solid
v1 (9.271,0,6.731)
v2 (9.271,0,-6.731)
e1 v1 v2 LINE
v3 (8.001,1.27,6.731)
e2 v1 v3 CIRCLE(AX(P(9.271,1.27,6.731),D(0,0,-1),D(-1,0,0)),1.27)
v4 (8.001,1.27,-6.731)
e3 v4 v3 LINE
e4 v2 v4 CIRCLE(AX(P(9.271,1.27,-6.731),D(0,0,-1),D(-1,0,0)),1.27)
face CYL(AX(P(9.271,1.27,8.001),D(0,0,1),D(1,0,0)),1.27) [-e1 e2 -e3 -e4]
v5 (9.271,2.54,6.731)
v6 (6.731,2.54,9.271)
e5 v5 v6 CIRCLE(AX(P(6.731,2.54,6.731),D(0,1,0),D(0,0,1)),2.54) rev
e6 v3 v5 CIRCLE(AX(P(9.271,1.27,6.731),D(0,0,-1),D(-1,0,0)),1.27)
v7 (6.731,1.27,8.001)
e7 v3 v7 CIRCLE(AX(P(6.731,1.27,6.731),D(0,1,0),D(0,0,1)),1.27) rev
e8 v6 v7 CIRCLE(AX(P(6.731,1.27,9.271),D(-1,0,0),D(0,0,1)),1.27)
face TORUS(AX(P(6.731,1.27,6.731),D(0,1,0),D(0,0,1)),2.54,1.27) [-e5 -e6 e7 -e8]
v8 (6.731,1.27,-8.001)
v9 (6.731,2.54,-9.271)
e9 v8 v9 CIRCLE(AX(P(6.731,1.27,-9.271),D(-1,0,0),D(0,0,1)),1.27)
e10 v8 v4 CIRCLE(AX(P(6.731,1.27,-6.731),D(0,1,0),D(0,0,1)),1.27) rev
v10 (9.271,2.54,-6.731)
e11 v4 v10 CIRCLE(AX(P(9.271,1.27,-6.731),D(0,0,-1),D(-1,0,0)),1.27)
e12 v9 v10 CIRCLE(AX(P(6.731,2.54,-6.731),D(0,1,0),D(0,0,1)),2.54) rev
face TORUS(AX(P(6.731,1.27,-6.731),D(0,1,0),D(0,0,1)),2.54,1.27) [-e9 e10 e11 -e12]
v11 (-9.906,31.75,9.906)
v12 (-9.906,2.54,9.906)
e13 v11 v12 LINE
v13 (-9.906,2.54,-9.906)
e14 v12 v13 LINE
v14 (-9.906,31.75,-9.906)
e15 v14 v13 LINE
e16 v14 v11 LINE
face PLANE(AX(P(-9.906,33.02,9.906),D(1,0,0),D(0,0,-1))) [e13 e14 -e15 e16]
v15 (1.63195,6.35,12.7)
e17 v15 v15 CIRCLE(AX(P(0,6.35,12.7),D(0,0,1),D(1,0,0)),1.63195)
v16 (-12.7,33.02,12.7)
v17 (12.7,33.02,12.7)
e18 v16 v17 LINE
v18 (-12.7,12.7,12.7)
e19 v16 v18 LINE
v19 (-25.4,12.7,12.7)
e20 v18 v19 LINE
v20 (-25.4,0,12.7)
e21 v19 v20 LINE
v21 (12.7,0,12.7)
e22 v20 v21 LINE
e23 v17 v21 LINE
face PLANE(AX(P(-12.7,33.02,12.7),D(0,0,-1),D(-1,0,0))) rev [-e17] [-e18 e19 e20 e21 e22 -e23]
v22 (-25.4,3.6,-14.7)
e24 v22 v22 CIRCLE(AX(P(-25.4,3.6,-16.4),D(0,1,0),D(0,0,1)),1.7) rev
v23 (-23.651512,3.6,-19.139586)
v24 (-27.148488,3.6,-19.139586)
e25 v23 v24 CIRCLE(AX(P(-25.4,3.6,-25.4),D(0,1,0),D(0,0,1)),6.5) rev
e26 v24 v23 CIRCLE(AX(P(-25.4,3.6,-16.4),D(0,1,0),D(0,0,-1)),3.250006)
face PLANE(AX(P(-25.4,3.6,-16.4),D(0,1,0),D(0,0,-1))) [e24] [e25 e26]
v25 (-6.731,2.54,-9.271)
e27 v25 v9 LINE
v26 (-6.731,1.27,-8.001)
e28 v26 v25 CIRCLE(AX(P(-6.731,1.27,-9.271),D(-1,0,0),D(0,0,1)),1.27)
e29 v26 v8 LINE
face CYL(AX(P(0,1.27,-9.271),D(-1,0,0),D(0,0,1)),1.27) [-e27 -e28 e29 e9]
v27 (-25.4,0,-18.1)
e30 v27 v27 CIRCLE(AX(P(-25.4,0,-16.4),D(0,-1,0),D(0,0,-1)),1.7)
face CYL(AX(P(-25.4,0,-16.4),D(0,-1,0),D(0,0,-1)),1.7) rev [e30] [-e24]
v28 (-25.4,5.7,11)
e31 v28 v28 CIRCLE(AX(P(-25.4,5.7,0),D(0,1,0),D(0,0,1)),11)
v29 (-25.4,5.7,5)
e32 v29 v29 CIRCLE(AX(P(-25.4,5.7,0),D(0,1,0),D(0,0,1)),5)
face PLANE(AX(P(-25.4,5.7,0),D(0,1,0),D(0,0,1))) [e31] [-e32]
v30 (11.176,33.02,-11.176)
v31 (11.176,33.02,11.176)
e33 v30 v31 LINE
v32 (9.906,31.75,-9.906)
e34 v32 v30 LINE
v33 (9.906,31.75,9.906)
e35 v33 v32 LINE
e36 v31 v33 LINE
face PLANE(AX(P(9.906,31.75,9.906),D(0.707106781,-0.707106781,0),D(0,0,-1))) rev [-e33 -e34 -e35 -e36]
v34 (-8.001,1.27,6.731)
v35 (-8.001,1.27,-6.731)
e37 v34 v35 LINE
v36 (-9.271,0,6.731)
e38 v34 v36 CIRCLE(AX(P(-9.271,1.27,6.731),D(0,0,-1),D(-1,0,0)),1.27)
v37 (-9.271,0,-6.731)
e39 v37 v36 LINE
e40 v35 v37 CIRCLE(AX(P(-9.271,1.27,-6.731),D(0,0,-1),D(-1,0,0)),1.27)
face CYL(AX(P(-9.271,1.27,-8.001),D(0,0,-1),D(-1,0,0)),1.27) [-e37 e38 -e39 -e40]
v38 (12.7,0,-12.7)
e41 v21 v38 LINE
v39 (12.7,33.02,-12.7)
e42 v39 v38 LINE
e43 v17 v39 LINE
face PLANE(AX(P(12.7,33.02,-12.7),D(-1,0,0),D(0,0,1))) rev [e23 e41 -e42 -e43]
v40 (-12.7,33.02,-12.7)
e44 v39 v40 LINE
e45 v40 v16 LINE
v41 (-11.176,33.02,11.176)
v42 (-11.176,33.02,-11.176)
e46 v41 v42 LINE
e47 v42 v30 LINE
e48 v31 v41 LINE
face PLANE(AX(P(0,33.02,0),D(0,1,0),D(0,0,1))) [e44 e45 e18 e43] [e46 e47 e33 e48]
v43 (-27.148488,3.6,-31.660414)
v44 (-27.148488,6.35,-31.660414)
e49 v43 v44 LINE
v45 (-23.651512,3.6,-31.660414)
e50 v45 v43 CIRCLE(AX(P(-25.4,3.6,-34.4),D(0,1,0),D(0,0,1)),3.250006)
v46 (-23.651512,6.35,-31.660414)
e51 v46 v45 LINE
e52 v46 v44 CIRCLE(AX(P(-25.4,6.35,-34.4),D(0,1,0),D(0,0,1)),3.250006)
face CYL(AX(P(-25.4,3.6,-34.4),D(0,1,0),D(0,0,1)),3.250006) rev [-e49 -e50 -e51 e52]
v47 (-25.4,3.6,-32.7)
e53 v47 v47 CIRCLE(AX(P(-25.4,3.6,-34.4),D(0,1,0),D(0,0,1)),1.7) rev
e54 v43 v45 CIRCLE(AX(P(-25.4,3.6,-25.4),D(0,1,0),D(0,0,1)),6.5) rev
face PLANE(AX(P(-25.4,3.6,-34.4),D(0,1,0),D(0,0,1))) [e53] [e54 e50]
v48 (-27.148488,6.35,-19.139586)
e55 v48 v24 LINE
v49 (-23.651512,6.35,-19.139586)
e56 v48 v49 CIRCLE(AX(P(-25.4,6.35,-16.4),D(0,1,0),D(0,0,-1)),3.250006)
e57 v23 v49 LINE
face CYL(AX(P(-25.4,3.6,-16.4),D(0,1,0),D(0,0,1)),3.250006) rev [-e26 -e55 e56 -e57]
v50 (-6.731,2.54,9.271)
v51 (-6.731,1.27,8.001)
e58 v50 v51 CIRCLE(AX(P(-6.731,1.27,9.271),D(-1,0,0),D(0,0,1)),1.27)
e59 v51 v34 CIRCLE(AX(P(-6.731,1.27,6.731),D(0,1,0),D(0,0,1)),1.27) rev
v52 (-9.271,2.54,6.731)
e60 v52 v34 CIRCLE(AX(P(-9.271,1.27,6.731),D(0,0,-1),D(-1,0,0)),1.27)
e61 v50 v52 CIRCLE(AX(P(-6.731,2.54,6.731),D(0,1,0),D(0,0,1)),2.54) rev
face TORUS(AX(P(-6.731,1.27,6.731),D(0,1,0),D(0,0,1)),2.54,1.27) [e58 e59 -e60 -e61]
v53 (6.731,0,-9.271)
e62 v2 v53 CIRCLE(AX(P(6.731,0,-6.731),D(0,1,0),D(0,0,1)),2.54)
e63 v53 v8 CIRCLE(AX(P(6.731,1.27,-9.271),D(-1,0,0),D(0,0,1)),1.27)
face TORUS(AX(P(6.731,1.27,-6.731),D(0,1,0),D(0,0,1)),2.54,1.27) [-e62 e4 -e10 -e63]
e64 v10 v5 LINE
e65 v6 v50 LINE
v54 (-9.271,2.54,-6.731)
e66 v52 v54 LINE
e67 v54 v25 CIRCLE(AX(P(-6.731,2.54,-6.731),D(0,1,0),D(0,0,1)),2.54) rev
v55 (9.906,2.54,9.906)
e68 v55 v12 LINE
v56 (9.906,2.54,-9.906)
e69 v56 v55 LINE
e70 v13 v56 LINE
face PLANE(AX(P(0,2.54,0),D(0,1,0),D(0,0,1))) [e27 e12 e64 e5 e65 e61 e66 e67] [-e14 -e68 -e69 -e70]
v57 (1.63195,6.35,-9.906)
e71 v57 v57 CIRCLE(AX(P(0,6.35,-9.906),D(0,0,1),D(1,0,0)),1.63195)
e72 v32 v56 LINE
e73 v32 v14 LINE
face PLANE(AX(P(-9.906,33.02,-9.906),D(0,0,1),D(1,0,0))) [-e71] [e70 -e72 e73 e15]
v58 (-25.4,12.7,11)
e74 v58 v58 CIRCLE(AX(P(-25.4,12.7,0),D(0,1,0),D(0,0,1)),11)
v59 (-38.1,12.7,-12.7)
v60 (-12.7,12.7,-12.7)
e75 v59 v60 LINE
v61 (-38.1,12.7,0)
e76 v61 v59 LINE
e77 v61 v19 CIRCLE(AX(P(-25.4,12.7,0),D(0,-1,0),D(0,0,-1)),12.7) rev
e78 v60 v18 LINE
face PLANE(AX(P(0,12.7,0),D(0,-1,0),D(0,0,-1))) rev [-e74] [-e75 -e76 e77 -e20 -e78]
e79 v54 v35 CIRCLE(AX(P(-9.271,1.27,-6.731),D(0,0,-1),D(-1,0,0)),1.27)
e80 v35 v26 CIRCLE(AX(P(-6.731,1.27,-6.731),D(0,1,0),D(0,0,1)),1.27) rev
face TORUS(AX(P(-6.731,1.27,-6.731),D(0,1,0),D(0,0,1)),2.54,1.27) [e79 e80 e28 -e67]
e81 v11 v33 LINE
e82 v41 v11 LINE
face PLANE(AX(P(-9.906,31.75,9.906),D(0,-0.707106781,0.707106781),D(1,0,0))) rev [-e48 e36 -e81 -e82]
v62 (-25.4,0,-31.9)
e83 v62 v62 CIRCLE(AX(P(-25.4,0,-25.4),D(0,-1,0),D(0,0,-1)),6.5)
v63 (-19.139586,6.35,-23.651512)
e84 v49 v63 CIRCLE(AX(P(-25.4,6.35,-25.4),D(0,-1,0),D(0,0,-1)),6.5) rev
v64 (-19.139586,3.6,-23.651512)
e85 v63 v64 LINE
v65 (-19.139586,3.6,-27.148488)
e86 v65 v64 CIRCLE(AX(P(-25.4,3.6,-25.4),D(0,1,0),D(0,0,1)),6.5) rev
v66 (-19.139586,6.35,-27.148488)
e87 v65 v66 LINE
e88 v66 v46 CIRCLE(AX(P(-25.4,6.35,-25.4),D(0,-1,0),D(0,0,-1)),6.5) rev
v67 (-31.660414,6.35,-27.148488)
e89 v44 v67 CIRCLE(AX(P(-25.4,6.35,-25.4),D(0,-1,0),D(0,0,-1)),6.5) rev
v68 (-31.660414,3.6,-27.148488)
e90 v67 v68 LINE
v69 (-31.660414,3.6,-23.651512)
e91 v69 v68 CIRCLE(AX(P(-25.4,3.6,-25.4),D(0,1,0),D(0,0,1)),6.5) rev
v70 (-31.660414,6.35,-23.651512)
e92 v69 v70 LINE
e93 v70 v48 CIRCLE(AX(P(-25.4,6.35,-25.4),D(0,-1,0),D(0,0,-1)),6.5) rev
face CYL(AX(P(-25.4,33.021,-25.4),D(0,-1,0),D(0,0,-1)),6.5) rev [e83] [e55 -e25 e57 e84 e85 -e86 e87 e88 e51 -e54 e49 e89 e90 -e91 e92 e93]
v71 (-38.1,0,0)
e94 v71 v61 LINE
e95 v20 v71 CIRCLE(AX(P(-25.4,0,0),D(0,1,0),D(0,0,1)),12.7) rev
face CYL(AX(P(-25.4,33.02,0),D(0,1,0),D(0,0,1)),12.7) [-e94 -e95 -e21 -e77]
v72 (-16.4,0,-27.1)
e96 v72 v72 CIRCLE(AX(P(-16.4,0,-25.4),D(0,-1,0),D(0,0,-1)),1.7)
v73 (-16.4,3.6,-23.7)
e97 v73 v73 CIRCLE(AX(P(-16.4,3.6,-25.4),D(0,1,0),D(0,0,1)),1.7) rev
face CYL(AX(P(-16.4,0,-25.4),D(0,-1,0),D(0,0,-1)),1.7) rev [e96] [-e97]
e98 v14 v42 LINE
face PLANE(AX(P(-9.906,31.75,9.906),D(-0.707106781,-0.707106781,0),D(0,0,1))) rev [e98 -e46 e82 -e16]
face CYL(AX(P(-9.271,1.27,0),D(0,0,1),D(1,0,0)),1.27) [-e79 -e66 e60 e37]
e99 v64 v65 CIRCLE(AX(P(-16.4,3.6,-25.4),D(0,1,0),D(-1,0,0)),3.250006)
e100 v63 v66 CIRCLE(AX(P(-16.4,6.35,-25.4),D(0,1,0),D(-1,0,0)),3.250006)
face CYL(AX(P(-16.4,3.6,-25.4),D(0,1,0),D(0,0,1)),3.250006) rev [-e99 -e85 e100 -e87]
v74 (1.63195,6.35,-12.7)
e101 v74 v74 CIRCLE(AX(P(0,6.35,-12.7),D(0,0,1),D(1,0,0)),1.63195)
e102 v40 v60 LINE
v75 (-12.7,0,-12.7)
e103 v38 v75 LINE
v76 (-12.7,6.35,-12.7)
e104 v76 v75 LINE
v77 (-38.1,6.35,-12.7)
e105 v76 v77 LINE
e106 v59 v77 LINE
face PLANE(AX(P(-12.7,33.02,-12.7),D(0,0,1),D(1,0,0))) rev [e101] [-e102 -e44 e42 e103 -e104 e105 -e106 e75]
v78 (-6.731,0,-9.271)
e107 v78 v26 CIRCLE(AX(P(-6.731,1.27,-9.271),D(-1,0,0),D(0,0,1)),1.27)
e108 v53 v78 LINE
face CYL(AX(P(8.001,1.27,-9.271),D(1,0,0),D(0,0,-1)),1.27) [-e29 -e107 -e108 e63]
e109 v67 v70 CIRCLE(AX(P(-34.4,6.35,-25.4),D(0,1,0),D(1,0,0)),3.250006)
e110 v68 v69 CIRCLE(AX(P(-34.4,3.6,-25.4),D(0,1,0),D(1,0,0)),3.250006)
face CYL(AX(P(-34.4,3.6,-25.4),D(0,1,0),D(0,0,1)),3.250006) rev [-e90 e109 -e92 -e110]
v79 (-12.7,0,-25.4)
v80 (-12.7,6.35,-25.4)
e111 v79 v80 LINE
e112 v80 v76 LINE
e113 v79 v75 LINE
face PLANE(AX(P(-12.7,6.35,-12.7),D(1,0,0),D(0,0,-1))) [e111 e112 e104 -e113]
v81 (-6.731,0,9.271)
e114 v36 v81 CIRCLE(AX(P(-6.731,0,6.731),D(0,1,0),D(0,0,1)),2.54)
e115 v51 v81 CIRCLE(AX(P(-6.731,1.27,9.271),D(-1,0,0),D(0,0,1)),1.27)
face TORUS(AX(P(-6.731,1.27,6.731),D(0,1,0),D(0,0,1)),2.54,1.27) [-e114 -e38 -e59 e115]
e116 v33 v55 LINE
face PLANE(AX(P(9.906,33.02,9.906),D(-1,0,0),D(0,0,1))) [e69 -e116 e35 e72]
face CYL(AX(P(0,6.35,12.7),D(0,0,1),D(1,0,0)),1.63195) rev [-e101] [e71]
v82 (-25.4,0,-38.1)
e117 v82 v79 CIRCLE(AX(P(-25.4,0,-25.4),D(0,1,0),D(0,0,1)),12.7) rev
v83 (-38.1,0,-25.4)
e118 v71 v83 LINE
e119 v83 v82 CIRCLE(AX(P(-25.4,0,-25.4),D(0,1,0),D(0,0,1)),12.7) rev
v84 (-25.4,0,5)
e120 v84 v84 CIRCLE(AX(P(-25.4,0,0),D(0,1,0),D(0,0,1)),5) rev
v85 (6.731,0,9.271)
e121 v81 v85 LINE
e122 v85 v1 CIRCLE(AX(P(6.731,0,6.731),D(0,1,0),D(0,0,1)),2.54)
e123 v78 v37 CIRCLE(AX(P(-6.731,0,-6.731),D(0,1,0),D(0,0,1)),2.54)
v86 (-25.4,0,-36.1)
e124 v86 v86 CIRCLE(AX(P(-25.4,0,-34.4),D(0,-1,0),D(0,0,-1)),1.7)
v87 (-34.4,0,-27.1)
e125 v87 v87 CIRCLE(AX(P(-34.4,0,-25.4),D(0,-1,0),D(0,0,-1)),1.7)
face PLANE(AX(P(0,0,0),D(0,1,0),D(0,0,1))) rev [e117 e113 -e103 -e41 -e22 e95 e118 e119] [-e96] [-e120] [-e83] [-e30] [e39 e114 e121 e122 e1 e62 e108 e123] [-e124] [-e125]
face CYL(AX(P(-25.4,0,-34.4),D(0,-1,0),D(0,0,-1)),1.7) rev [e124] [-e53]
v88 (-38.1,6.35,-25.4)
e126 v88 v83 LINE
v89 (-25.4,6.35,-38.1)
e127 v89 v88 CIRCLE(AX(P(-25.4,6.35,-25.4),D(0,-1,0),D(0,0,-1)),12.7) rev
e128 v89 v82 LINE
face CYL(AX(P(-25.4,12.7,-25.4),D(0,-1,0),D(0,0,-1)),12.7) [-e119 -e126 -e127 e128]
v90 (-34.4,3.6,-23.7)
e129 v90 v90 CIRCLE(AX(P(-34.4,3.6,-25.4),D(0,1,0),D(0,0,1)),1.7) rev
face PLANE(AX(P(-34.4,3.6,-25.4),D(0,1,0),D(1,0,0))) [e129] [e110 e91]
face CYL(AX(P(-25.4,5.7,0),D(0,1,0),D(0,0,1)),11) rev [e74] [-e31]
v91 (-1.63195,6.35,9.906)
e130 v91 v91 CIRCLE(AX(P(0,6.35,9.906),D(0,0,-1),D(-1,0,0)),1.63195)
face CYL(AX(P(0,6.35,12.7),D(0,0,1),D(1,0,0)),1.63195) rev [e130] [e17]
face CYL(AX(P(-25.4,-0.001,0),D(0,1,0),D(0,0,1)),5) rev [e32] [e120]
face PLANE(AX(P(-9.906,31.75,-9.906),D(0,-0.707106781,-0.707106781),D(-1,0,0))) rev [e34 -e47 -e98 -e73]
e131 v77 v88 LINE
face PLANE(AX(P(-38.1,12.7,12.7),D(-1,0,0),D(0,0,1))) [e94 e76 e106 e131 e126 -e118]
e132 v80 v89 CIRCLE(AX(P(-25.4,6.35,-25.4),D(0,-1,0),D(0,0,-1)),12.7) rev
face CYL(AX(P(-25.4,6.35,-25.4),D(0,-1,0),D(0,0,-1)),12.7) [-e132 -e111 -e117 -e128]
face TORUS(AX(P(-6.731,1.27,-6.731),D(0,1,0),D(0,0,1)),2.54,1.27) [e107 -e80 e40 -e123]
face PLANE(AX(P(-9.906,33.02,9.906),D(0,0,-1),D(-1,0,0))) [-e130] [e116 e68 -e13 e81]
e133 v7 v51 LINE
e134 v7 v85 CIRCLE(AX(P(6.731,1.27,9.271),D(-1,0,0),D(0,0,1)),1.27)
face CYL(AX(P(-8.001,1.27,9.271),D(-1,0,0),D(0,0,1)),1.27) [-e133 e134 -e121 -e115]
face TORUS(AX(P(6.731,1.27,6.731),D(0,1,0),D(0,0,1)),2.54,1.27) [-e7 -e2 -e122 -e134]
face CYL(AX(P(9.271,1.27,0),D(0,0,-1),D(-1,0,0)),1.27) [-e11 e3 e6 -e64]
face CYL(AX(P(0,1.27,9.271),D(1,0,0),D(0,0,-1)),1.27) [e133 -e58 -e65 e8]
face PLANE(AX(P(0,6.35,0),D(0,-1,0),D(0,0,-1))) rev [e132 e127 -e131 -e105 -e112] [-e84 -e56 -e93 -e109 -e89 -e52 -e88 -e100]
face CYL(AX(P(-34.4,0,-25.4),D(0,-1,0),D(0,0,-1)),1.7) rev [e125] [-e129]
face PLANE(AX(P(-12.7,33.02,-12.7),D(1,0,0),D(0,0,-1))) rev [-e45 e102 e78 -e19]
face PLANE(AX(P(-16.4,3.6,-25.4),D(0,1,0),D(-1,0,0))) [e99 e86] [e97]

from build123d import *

# Parameters (mm, degrees)
SKETCH1_W             = 25.4
SKETCH1_H             = 25.4
SKETCH1_W_2           = 19.812
SKETCH1_H_2           = 19.812
BOSS_EXTRUDE1_DEPTH   = 33.02
SKETCH9_W             = 25.4
SKETCH9_H             = 25.4
BOSS_EXTRUDE5_DEPTH   = 12.7
SKETCH14_W            = 19.812
SKETCH14_H            = 19.812
SKETCH14_W_2          = 16.002
SKETCH14_H_2          = 16.002
BOSS_EXTRUDE6_DEPTH   = 2.54
SKETCH10_R            = 11
CUT_EXTRUDE1_DEPTH    = 7
CUT_EXTRUDE2_REACH    = 50.572
SKETCH15_R            = 5
SKETCH17_W            = 25.4
SKETCH17_H            = 25.4
BOSS_EXTRUDE7_DEPTH   = 6.35
CUT_EXTRUDE4_REACH    = 65.194
SKETCH18_R            = 6.5
CIRPATTERN1_COUNT     = 4
SKETCH23_R            = 3.2500062
CUT_EXTRUDE5_DEPTH    = 2.75
CIRPATTERN2_COUNT     = 4
FILLET3_R             = 12.7
FILLET4_R             = 1.27
FILLET5_R             = 1.27
F_4_CLEARANCE_HOLE1_D = 3.2639
CHAMFER1_SIZE         = 1.27


with BuildPart() as part:
    # Sketch1 → Boss-Extrude1 (new body)
    with BuildSketch(Plane(origin=(0, 0, 0), x_dir=(1, 0, 0), z_dir=(0, 1, 0))):
        Rectangle(SKETCH1_W, SKETCH1_H)
        Rectangle(SKETCH1_W_2, SKETCH1_H_2, mode=Mode.SUBTRACT)
    extrude(amount=BOSS_EXTRUDE1_DEPTH)

    # Sketch9 → Boss-Extrude5 (add)
    with BuildSketch(Plane.XZ):
        with Locations((-25.4, 0)):
            Rectangle(SKETCH9_W, SKETCH9_H)
    extrude(amount=-BOSS_EXTRUDE5_DEPTH)

    # Sketch14 → Boss-Extrude6 (add)
    with BuildSketch(Plane.XZ):
        Rectangle(SKETCH14_W, SKETCH14_H)
        Rectangle(SKETCH14_W_2, SKETCH14_H_2, mode=Mode.SUBTRACT)
    extrude(amount=-BOSS_EXTRUDE6_DEPTH)

    # Sketch10 → Cut-Extrude1 (cut)
    with BuildSketch(Plane(origin=(0, 12.7, 0), x_dir=(1, 0, 0), z_dir=(0, 1, 0))):
        with Locations(Location((-25.4, 0, 0), (0, 0, 270))):
            Circle(SKETCH10_R)
    extrude(amount=-CUT_EXTRUDE1_DEPTH, mode=Mode.SUBTRACT)

    # Sketch15 → Cut-Extrude2 (cut, up to next)
    with BuildSketch(Plane(origin=(0, 5.7, 0), x_dir=(1, 0, 0), z_dir=(0, 1, 0)), mode=Mode.PRIVATE) as cut_extrude2_sk1:
        with Locations(Location((-25.4, 0, 0), (0, 0, 270))):
            Circle(SKETCH15_R)
    cut_extrude2_tool1 = extrude(cut_extrude2_sk1.sketch, amount=-CUT_EXTRUDE2_REACH, mode=Mode.PRIVATE) & part.part
    add(cut_extrude2_tool1.solids().sort_by_distance((-25.4, 5.7, 0))[0], mode=Mode.SUBTRACT)

    # Sketch17 → Boss-Extrude7 (add)
    with BuildSketch(Plane.XZ):
        with Locations((-25.4, -25.4)):
            Rectangle(SKETCH17_W, SKETCH17_H)
    extrude(amount=-BOSS_EXTRUDE7_DEPTH)

    # Sketch18 → Cut-Extrude4 (cut, up to next)
    with BuildSketch(Plane.XZ, mode=Mode.PRIVATE) as cut_extrude4_sk1:
        with Locations(Location((-25.4, -25.4, 0), (0, 0, 270))):
            Circle(SKETCH18_R)
    cut_extrude4_tool1 = extrude(cut_extrude4_sk1.sketch, amount=-CUT_EXTRUDE4_REACH, mode=Mode.PRIVATE) & part.part
    add(cut_extrude4_tool1.solids().sort_by_distance((-25.4, 0, -25.4))[0], mode=Mode.SUBTRACT)

    # Sketch22 → M3 Clearance Hole1 (revolve, cut)
    with BuildSketch(Plane(origin=(-16.4, 0, -25.4), x_dir=(0, 0, -1), z_dir=(1, 0, 0))):
        Polygon((0, 0), (0, 13.721463052), (1.7, 12.7), (1.7, 0), align=None)
    m3_clearance_hole1 = revolve(axis=Axis((-16.4, -6.35, -25.4), (0, 1, 0)), mode=Mode.SUBTRACT)

    # CirPattern1: M3 Clearance Hole1 ×4 about axis
    cirpattern1_axis = Axis((-25.4, 0, -25.4), (0, 1, 0))
    for i in range(1, CIRPATTERN1_COUNT):
        add(m3_clearance_hole1.rotate(cirpattern1_axis, i * 360 / CIRPATTERN1_COUNT), mode=Mode.SUBTRACT)

    # Sketch23 → Cut-Extrude5 (cut)
    with BuildSketch(Plane(origin=(0, 6.35, 0), x_dir=(1, 0, 0), z_dir=(0, 1, 0))):
        with Locations((-25.4, 34.4)):
            Circle(SKETCH23_R)
    cut_extrude5 = extrude(amount=-CUT_EXTRUDE5_DEPTH, mode=Mode.SUBTRACT)

    # CirPattern2: Cut-Extrude5 ×4 about axis
    cirpattern2_axis = Axis((-25.4, 0, -25.4), (0, 1, 0))
    for i in range(1, CIRPATTERN2_COUNT):
        add(cut_extrude5.rotate(cirpattern2_axis, i * 360 / CIRPATTERN2_COUNT), mode=Mode.SUBTRACT)

    # Fillet3
    fillet3_edges = [part.edges().sort_by_distance(p)[0] for p in [
        (-38.1, 3.175, -38.1),
        (-12.7, 3.175, -38.1),
        (-38.1, 6.35, 12.7),
    ]]
    fillet(fillet3_edges, radius=FILLET3_R - 0.0001)  # a hair under: the kernel refuses the full size

    # Fillet4
    fillet4_edges = [part.edges().sort_by_distance(p)[0] for p in [
        (-8.001, 1.27, 8.001),
        (8.001, 1.27, 8.001),
        (8.001, 1.27, -8.001),
        (-8.001, 1.27, -8.001),
    ]]
    fillet(fillet4_edges, radius=FILLET4_R)

    # Fillet5
    fillet5_edges = [part.edges().sort_by_distance(p)[0] for p in [
        (-7.629025612, 2.54, -7.629025612),
        (-8.001, 2.54, 0),
        (-7.629025612, 2.54, 7.629025612),
        (0, 2.54, 8.001),
        (7.629025612, 2.54, 7.629025612),
        (8.001, 2.54, 0),
        (7.629025612, 2.54, -7.629025612),
        (-7.629025612, 0, -7.629025612),
        (-8.001, 0, 0),
        (-7.629025612, 0, 7.629025612),
        (0, 0, 8.001),
        (7.629025612, 0, 7.629025612),
        (8.001, 0, 0),
        (7.629025612, 0, -7.629025612),
        (0, 2.54, -8.001),
        (0, 0, -8.001),
    ]]
    fillet(fillet5_edges, radius=FILLET5_R - 0.0001)  # a hair under: the kernel refuses the full size

    # #4 Clearance Hole1 (through all)
    with Locations(Plane.XY.offset(12.7)):
        with Locations((0, 6.35)):
            Hole(F_4_CLEARANCE_HOLE1_D / 2)

    # Chamfer1
    chamfer1_edges = [part.edges().sort_by_distance(p)[0] for p in [
        (9.906, 33.02, 0),
        (0, 33.02, -9.906),
        (-9.906, 33.02, 0),
        (0, 33.02, 9.906),
    ]]
    chamfer(chamfer1_edges, length=CHAMFER1_SIZE)


solid = part.part
